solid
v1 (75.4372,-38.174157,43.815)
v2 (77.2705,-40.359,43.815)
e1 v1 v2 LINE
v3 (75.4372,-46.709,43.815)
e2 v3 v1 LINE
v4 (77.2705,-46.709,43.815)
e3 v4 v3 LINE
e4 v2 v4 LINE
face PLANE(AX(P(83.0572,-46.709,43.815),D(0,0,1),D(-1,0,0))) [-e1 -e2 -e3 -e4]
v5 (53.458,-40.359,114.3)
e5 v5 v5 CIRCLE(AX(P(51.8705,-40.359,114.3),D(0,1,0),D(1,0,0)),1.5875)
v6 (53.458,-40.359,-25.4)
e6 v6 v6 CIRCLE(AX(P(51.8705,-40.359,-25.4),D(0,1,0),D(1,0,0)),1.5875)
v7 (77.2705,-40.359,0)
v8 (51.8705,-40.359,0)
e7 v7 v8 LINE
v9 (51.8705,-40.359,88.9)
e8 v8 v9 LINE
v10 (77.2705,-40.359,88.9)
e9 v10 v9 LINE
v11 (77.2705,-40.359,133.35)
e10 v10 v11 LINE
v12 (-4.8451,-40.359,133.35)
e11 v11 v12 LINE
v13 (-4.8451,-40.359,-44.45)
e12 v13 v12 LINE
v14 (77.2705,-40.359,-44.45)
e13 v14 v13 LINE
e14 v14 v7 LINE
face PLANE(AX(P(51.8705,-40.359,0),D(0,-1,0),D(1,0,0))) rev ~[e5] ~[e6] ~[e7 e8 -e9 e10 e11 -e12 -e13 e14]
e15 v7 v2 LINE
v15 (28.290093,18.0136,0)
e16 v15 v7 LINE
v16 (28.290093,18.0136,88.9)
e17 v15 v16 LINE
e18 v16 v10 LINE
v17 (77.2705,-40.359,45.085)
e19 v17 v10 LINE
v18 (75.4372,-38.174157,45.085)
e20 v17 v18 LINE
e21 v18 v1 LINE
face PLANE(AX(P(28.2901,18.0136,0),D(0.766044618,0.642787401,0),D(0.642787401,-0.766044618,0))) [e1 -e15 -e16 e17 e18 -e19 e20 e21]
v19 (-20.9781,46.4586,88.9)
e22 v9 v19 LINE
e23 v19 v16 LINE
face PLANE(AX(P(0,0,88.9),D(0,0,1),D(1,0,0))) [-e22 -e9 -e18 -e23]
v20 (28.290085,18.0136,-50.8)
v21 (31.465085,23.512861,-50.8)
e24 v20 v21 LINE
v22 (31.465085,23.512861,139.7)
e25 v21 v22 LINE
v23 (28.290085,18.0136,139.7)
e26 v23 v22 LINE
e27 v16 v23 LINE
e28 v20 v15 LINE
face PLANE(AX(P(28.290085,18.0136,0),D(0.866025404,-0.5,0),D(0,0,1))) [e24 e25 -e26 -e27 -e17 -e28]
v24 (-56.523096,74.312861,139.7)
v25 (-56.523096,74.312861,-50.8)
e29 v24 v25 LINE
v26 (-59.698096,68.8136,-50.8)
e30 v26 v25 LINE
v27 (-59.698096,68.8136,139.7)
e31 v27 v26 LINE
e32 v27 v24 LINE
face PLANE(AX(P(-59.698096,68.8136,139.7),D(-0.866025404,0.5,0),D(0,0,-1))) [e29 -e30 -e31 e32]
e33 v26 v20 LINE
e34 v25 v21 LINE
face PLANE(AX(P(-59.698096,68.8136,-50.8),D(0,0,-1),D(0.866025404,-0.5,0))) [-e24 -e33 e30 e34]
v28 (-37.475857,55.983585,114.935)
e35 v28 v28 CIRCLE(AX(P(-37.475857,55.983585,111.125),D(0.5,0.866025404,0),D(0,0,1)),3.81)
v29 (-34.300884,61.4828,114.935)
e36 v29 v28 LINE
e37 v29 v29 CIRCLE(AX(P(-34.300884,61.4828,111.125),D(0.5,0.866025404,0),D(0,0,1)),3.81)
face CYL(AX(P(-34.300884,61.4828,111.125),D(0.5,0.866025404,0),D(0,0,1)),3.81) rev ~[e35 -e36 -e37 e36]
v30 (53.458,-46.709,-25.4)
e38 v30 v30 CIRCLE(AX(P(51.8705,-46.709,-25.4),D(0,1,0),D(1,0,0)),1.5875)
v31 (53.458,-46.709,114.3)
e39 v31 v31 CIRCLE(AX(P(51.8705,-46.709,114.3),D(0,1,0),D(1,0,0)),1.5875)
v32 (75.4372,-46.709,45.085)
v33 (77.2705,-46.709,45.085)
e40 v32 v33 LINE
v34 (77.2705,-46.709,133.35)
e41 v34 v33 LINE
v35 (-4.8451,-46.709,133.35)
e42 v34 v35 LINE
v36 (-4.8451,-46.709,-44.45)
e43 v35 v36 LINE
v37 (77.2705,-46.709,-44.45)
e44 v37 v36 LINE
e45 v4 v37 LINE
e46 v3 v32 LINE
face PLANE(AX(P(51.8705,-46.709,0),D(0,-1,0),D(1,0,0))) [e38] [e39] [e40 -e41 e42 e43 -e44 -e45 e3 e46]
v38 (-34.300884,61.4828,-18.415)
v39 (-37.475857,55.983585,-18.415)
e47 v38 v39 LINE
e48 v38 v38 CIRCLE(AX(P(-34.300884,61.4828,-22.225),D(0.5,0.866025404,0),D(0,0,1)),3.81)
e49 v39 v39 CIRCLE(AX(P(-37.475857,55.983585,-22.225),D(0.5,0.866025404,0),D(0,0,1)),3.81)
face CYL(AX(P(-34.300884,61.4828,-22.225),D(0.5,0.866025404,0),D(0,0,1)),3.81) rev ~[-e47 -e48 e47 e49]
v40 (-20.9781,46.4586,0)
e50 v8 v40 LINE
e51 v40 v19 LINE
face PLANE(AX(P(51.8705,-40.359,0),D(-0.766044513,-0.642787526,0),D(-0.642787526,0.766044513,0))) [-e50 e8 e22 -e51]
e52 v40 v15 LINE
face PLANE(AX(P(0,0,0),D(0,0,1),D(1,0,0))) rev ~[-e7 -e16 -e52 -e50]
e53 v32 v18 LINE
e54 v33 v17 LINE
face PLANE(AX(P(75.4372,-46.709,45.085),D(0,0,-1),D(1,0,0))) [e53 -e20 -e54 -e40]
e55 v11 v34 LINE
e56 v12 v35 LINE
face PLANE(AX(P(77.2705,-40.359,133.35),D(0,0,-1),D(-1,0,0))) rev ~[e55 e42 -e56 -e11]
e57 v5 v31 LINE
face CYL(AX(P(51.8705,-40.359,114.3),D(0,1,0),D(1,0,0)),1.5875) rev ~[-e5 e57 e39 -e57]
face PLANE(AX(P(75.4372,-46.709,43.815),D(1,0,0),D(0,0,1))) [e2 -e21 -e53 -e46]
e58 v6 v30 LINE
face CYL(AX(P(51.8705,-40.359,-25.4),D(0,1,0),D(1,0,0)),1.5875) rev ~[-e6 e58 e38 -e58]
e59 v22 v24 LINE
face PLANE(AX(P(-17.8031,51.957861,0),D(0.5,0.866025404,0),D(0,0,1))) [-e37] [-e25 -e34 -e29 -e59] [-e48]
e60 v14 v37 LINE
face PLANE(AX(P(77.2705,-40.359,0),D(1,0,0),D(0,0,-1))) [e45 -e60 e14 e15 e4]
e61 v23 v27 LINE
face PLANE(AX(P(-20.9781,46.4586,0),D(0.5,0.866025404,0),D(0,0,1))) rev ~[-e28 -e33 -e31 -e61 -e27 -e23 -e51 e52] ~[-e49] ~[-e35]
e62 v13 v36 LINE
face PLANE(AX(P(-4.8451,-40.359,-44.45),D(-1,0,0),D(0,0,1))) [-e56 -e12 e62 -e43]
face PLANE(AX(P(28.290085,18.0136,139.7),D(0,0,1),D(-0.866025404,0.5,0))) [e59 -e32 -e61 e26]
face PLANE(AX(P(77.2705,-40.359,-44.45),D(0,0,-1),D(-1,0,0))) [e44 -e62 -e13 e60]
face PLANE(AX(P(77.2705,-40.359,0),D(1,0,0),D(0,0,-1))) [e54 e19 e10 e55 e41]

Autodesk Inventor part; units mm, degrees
ref_plane "YZ Plane" through (0, 0, 0) normal (1, 0, 0) x (0, 1, 0)
ref_plane "XZ Plane" through (0, 0, 0) normal (0, 1, 0) x (-1, 0, 0)
ref_plane "XY Plane" through (0, 0, 0) normal (0, 0, 1) x (1, 0, 0)
sketch "Sketch1" plane through (0, 0, 0) normal (0, 0, 1) x (1, 0, 0)
  line L0 (28.2901, 18.0136) -> (77.2705, -40.359)
  line L1 (77.2705, -40.359) -> (51.8705, -40.359)
  line L2 (51.8705, -40.359) -> (-20.9781, 46.4586)
  line L3 (-20.9781, 46.4586) -> (28.2901, 18.0136)
  point P0 (0, 0)
  point P1 (3.656, 32.2361)
  dimension "d0" = 76.2
  dimension "d2" = 25.4
  dimension "d34" = 130
  dimension "d35" = 160
extrude "Extrusion1" add sketch "Sketch1" along normal blind 88.9
sketch "Sketch2" plane through (-20.9781, 46.4586, 0) normal (0.5, 0.8660254, 0) x (0, 0, 1)
  line L0 (0, 0) -> (0, 56.89) projected
  line L1 (-50.8, 56.89) -> (139.7, 56.89)
  line L2 (139.7, 56.89) -> (139.7, -44.71)
  line L3 (139.7, -44.71) -> (-50.8, -44.71)
  line L4 (-50.8, -44.71) -> (-50.8, 56.89)
  line L5 (0, 56.89) -> (88.9, 56.89) projected
  point P0 (0, 41.3969)
  point P1 (44.45, 19.4575)
  dimension "d6" = 190.5
  dimension "d8" = 95.25
  dimension "d9" = 101.6
  dimension "d10" = 44.45
  dimension "d11" = 88.9
  dimension "d12" = 56.89
  dimension "d45" = 0
extrude "Extrusion2" add sketch "Sketch2" along normal blind 6.35
sketch "Sketch3" plane through (-17.8031, 51.9578, 0) normal (0.5, 0.8660254, 0) x (0, 0, 1)
  line L0 (139.7, 56.89) -> (-50.8, 56.89) projected
  circle A0 centre (-22.225, -19.05) radius 3.81
  circle A1 centre (111.125, -19.05) radius 3.81
  line L1 (-50.8, -44.71) -> (139.7, -44.71) projected
  line L2 (44.45, -44.71) -> (44.45, 56.89)
  line L3 (0, 0) -> (88.9, 0) projected
  point P0 (0, 41.3969)
  dimension "d17" = 7.62
  dimension "d18" = 7.62
  dimension "d19" = 0
  dimension "d46" = 133.35
  dimension "d47" = 66.675
  dimension "d86" = 19.05
extrude "Extrusion3" cut sketch "Sketch3" against normal up to next
sketch "Sketch6" plane through (-17.8031, 51.9578, 0) normal (0.5, 0.8660254, 0) x (0.8660254, -0.5, 0)
  circle A0 centre (-19.05, 22.225) radius 3.81 projected
  circle A1 centre (-19.05, -111.125) radius 3.81 projected
  line L0 (6.35, 34.925) -> (-44.45, 34.925)
  line L1 (-44.45, 34.925) -> (-44.45, -15.875)
  line L2 (-44.45, -15.875) -> (6.35, -15.875)
  line L3 (6.35, -15.875) -> (6.35, 34.925)
  line L4 (6.35, -73.025) -> (-44.45, -73.025)
  line L5 (-44.45, -73.025) -> (-44.45, -123.825)
  line L6 (-44.45, -123.825) -> (6.35, -123.825)
  line L7 (6.35, -123.825) -> (6.35, -73.025)
  point P0 (41.3969, 0)
  dimension "d52" = 50.8
  dimension "d60" = 25.4
  dimension "d61" = 25.4
  dimension "d62" = 50.8
  dimension "d63" = 12.7
  dimension "d64" = 12.7
extrude "Extrusion5" [suppressed]
sketch "Sketch7" plane through (-18.1206, 51.4079, 0) normal (0.5, 0.8660254, 0) x (0.8660254, -0.5, 0)
  line L0 (6.35, 38.1) -> (-44.45, 38.1) projected
  line L1 (6.35, -76.2) -> (-44.45, -76.2) projected
  line L2 (-44.45, -76.2) -> (-44.45, -127) projected
  line L3 (-44.45, -127) -> (6.35, -127) projected
  line L4 (6.35, -127) -> (6.35, -76.2) projected
  line L5 (-44.45, -12.7) -> (-39.2324, -12.7)
  line L6 (-39.2324, -12.7) -> (-39.2324, 38.1)
  line L7 (-39.2324, 38.1) -> (-44.45, 38.1)
  line L8 (-44.45, 38.1) -> (-44.45, -12.7)
  line L9 (-44.45, -127) -> (-39.2324, -127)
  line L10 (-39.2324, -127) -> (-39.2324, -76.2)
  line L11 (-39.2324, -76.2) -> (-44.45, -76.2)
  line L12 (-44.45, -76.2) -> (-44.45, -127)
  point P0 (41.3969, 0)
  dimension "d56" = 5.2176
  dimension "d57" = 5.2176
extrude "Extrusion6" [suppressed]
sketch "Sketch13" plane through (-57.8855, 71.4332, -38.1) normal (-0.8660254, 0.5, 0) x (0, 0, 1)
  line L0 (0, 0) -> (0, 2.54) projected
  circle A0 centre (25.4, 39.096) radius 3.175
  circle A1 centre (139.7, 39.096) radius 3.175
  line L1 (114.3, 0) -> (114.3, 2.54) projected
  point P0 (50.8, 53.34)
  point P1 (0, 53.34)
  point P2 (38.1, -32.9202)
  point P3 (114.3, 53.34)
  dimension "d98" = 6.35
  dimension "d99" = 0
  dimension "d100" = 25.4
  dimension "d101" = 50.8
  dimension "d102" = 25.4
extrude "Extrusion11" [suppressed]
sketch "Sketch14" plane through (-57.8855, 71.4332, -38.1) normal (-0.8660254, 0.5, 0) x (0, 0, 1)
  circle A0 centre (25.4, 39.096) radius 3.175 projected
  line L0 (-107.95, 213.721) -> (273.05, 213.721)
  line L1 (273.05, 213.721) -> (273.05, -14.879)
  line L2 (273.05, -14.879) -> (-107.95, -14.879)
  line L3 (-107.95, -14.879) -> (-107.95, 213.721)
  point P0 (38.1, -32.9202)
  dimension "d107" = 381
  dimension "d109" = 228.6
  dimension "d110" = 133.35
  dimension "d111" = 53.975
extrude "Extrusion12" [suppressed]
sketch "Sketch18" plane through (-57.8855, 71.4332, -38.1) normal (0.8660254, -0.5, 0) x (0, 0, -1)
  line L0 (-273.05, -14.879) -> (107.95, -14.879) projected
  line L1 (-273.05, 213.721) -> (-195.9898, 213.721)
  line L2 (-195.9898, 213.721) -> (-195.9898, -14.879)
  line L3 (-195.9898, -14.879) -> (-273.05, -14.879)
  line L4 (-273.05, -14.879) -> (-273.05, 213.721)
  line L5 (107.95, 213.721) -> (30.8898, 213.721)
  line L6 (30.8898, 213.721) -> (30.8898, -14.879)
  line L7 (30.8898, -14.879) -> (107.95, -14.879)
  line L8 (107.95, -14.879) -> (107.95, 213.721)
  point P0 (-38.1, -32.9202)
extrude "Extrusion14" [suppressed]
sketch "Sketch15" plane through (0, 0, 0) normal (0, 0, 1) x (1, 0, 0)
  line L0 (15.9795, 275.571) -> (4.9809, 281.921) projected
  line L1 (-109.3191, 83.9476) -> (4.9809, 281.921) projected
  line L2 (-98.3205, 77.5976) -> (-109.3191, 83.9476) projected
  line L3 (77.2705, -40.359) -> (28.2901, 18.0136) projected
  line L4 (28.2901, 18.0136) -> (-20.9781, 46.4586) projected
  line L5 (-20.9781, 46.4586) -> (51.8705, -40.359) projected
  line L6 (51.8705, -40.359) -> (77.2705, -40.359) projected
  line L7 (77.2705, -40.359) -> (-405.3295, -40.359)
  line L8 (77.2705, -40.359) -> (204.2705, -40.359)
  line L9 (-98.3205, 77.5976) -> (15.9795, 275.571) projected
  point P0 (0, 0)
  point P1 (-65.325, 58.5476)
  point P2 (48.975, 256.521)
  dimension "d125" = 127
  dimension "d127" = 482.6
sketch "Sketch16" plane through (0, 0, 0) normal (0, 0, 1) x (1, 0, 0)
  line L0 (77.2705, -40.359) -> (-405.3295, -40.359) projected
  line L1 (15.9795, 275.571) -> (4.9809, 281.921) projected
  line L2 (-109.3191, 83.9476) -> (4.9809, 281.921) projected
  line L3 (-98.3205, 77.5976) -> (-109.3191, 83.9476) projected
  line L4 (77.2705, -40.359) -> (204.2705, -40.359) projected
  line L5 (-98.3205, 77.5976) -> (15.9795, 275.571) projected
  point P0 (0, 0)
  point P1 (-65.325, 58.5476)
  point P2 (51.8705, -40.359)
  point P3 (51.8705, -40.359)
  dimension "d129" = 457.2
  dimension "d130" = 322.28
  dimension "d131" = 98.9066
  dimension "d150" = 188.291
sketch "Sketch17" plane through (0, 0, 0) normal (0, 0, 1) x (1, 0, 0)
  line L0 (77.2705, -40.359) -> (-405.3295, -40.359) projected
  line L1 (-144.0325, 61.241) -> (-144.0325, -40.359)
  line L2 (-144.0325, -40.359) -> (-42.4325, -40.359)
  line L3 (-42.4325, -40.359) -> (-42.4325, 35.841)
  line L4 (-42.4325, 35.841) -> (-144.0325, 61.241)
  line L5 (77.2705, -40.359) -> (204.2705, -40.359) projected
  point P0 (0, 0)
  point P1 (-93.2325, -40.359)
  dimension "d141" = 101.6
  dimension "d142" = 101.6
  dimension "d146" = 76.2
  dimension "d147" = 297.503
  dimension "d151" = 312.097
extrude "Extrusion13" [suppressed]
sketch "Sketch19" plane through (51.8705, -40.359, 0) normal (0, -1, 0) x (1, 0, 0)
  line L0 (25.4, 0) -> (0, 0) projected
  line L1 (25.4, 0) -> (25.4, 88.9) projected
  line L2 (0, 88.9) -> (25.4, 88.9) projected
  line L3 (0, 0) -> (0, 88.9) projected
  line L4 (25.4, 88.9) -> (25.4, 133.35)
  line L5 (25.4, 133.35) -> (-56.7156, 133.35)
  line L6 (-56.7156, 133.35) -> (-56.7156, 71.7364)
  line L7 (25.4, 0) -> (25.4, -44.45)
  line L8 (25.4, -44.45) -> (-56.7156, -44.45)
  line L9 (-56.7156, -44.45) -> (-56.7156, 17.1636)
  line L10 (-56.7156, 71.7364) -> (-56.7156, 17.1636)
  point P0 (-51.8705, 0)
  dimension "d153" = 90
  dimension "d155" = 90
  dimension "d156" = 90
  dimension "d159" = 90
  dimension "d160" = 44.45
extrude "Extrusion15" add sketch "Sketch19" along normal blind 6.35
sketch "Sketch20" plane through (51.8705, -40.359, 0) normal (0, 1, 0) x (1, 0, 0)
  line L0 (25.4, 44.45) -> (25.4, 0) projected
  line L1 (-56.7156, 44.45) -> (25.4, 44.45) projected
  line L2 (25.4, -133.35) -> (-56.7156, -133.35) projected
  line L3 (25.4, -88.9) -> (25.4, -133.35) projected
  circle A0 centre (0, 25.4) radius 1.5875
  circle A1 centre (0, -114.3) radius 1.5875
  point P0 (-51.8705, 0)
  dimension "d161" = 3.175
  dimension "d162" = 19.05
  dimension "d163" = 25.4
  dimension "d164" = 19.05
  dimension "d165" = 25.4
extrude "Extrusion16" cut sketch "Sketch20" against normal blind 6.35
sketch "Sketch21" plane through (51.8705, -46.709, 0) normal (0, -1, 0) x (1, 0, 0)
  line L0 (25.4, 133.35) -> (-56.7156, 133.35) projected
  line L1 (-56.7156, -44.45) -> (25.4, -44.45) projected
  line L2 (23.5667, 45.085) -> (31.1867, 45.085)
  line L3 (31.1867, 45.085) -> (31.1867, 43.815)
  line L4 (31.1867, 43.815) -> (23.5667, 43.815)
  line L5 (23.5667, 43.815) -> (23.5667, 45.085)
  point P0 (-51.8705, 0)
  dimension "d168" = 1.27
  dimension "d170" = 177.8
  dimension "d171" = 88.265
  dimension "d172" = 7.62
extrude "Extrusion17" cut sketch "Sketch21" against normal blind 25.4
equation "\"d8\" = 0.5 * d6"
equation "\"d10\" = 0.5 * d11"
equation "\"d18\" = d17"
equation "\"d47\" = 0.5 * d46"
equation "\"d61\" = d60"
equation "\"d64\" = d63"
equation "\"d57\" = d56"
equation "\"d100\" = 0.5 * d101"
equation "\"d102\" = d100"
equation "\"d156\" = d155"
equation "\"d164\" = d162"
equation "\"d165\" = d163"
equation "\"d171\" = 0.5 * d170 - 0.5 * d168"
properties part number "Problem Solving"
